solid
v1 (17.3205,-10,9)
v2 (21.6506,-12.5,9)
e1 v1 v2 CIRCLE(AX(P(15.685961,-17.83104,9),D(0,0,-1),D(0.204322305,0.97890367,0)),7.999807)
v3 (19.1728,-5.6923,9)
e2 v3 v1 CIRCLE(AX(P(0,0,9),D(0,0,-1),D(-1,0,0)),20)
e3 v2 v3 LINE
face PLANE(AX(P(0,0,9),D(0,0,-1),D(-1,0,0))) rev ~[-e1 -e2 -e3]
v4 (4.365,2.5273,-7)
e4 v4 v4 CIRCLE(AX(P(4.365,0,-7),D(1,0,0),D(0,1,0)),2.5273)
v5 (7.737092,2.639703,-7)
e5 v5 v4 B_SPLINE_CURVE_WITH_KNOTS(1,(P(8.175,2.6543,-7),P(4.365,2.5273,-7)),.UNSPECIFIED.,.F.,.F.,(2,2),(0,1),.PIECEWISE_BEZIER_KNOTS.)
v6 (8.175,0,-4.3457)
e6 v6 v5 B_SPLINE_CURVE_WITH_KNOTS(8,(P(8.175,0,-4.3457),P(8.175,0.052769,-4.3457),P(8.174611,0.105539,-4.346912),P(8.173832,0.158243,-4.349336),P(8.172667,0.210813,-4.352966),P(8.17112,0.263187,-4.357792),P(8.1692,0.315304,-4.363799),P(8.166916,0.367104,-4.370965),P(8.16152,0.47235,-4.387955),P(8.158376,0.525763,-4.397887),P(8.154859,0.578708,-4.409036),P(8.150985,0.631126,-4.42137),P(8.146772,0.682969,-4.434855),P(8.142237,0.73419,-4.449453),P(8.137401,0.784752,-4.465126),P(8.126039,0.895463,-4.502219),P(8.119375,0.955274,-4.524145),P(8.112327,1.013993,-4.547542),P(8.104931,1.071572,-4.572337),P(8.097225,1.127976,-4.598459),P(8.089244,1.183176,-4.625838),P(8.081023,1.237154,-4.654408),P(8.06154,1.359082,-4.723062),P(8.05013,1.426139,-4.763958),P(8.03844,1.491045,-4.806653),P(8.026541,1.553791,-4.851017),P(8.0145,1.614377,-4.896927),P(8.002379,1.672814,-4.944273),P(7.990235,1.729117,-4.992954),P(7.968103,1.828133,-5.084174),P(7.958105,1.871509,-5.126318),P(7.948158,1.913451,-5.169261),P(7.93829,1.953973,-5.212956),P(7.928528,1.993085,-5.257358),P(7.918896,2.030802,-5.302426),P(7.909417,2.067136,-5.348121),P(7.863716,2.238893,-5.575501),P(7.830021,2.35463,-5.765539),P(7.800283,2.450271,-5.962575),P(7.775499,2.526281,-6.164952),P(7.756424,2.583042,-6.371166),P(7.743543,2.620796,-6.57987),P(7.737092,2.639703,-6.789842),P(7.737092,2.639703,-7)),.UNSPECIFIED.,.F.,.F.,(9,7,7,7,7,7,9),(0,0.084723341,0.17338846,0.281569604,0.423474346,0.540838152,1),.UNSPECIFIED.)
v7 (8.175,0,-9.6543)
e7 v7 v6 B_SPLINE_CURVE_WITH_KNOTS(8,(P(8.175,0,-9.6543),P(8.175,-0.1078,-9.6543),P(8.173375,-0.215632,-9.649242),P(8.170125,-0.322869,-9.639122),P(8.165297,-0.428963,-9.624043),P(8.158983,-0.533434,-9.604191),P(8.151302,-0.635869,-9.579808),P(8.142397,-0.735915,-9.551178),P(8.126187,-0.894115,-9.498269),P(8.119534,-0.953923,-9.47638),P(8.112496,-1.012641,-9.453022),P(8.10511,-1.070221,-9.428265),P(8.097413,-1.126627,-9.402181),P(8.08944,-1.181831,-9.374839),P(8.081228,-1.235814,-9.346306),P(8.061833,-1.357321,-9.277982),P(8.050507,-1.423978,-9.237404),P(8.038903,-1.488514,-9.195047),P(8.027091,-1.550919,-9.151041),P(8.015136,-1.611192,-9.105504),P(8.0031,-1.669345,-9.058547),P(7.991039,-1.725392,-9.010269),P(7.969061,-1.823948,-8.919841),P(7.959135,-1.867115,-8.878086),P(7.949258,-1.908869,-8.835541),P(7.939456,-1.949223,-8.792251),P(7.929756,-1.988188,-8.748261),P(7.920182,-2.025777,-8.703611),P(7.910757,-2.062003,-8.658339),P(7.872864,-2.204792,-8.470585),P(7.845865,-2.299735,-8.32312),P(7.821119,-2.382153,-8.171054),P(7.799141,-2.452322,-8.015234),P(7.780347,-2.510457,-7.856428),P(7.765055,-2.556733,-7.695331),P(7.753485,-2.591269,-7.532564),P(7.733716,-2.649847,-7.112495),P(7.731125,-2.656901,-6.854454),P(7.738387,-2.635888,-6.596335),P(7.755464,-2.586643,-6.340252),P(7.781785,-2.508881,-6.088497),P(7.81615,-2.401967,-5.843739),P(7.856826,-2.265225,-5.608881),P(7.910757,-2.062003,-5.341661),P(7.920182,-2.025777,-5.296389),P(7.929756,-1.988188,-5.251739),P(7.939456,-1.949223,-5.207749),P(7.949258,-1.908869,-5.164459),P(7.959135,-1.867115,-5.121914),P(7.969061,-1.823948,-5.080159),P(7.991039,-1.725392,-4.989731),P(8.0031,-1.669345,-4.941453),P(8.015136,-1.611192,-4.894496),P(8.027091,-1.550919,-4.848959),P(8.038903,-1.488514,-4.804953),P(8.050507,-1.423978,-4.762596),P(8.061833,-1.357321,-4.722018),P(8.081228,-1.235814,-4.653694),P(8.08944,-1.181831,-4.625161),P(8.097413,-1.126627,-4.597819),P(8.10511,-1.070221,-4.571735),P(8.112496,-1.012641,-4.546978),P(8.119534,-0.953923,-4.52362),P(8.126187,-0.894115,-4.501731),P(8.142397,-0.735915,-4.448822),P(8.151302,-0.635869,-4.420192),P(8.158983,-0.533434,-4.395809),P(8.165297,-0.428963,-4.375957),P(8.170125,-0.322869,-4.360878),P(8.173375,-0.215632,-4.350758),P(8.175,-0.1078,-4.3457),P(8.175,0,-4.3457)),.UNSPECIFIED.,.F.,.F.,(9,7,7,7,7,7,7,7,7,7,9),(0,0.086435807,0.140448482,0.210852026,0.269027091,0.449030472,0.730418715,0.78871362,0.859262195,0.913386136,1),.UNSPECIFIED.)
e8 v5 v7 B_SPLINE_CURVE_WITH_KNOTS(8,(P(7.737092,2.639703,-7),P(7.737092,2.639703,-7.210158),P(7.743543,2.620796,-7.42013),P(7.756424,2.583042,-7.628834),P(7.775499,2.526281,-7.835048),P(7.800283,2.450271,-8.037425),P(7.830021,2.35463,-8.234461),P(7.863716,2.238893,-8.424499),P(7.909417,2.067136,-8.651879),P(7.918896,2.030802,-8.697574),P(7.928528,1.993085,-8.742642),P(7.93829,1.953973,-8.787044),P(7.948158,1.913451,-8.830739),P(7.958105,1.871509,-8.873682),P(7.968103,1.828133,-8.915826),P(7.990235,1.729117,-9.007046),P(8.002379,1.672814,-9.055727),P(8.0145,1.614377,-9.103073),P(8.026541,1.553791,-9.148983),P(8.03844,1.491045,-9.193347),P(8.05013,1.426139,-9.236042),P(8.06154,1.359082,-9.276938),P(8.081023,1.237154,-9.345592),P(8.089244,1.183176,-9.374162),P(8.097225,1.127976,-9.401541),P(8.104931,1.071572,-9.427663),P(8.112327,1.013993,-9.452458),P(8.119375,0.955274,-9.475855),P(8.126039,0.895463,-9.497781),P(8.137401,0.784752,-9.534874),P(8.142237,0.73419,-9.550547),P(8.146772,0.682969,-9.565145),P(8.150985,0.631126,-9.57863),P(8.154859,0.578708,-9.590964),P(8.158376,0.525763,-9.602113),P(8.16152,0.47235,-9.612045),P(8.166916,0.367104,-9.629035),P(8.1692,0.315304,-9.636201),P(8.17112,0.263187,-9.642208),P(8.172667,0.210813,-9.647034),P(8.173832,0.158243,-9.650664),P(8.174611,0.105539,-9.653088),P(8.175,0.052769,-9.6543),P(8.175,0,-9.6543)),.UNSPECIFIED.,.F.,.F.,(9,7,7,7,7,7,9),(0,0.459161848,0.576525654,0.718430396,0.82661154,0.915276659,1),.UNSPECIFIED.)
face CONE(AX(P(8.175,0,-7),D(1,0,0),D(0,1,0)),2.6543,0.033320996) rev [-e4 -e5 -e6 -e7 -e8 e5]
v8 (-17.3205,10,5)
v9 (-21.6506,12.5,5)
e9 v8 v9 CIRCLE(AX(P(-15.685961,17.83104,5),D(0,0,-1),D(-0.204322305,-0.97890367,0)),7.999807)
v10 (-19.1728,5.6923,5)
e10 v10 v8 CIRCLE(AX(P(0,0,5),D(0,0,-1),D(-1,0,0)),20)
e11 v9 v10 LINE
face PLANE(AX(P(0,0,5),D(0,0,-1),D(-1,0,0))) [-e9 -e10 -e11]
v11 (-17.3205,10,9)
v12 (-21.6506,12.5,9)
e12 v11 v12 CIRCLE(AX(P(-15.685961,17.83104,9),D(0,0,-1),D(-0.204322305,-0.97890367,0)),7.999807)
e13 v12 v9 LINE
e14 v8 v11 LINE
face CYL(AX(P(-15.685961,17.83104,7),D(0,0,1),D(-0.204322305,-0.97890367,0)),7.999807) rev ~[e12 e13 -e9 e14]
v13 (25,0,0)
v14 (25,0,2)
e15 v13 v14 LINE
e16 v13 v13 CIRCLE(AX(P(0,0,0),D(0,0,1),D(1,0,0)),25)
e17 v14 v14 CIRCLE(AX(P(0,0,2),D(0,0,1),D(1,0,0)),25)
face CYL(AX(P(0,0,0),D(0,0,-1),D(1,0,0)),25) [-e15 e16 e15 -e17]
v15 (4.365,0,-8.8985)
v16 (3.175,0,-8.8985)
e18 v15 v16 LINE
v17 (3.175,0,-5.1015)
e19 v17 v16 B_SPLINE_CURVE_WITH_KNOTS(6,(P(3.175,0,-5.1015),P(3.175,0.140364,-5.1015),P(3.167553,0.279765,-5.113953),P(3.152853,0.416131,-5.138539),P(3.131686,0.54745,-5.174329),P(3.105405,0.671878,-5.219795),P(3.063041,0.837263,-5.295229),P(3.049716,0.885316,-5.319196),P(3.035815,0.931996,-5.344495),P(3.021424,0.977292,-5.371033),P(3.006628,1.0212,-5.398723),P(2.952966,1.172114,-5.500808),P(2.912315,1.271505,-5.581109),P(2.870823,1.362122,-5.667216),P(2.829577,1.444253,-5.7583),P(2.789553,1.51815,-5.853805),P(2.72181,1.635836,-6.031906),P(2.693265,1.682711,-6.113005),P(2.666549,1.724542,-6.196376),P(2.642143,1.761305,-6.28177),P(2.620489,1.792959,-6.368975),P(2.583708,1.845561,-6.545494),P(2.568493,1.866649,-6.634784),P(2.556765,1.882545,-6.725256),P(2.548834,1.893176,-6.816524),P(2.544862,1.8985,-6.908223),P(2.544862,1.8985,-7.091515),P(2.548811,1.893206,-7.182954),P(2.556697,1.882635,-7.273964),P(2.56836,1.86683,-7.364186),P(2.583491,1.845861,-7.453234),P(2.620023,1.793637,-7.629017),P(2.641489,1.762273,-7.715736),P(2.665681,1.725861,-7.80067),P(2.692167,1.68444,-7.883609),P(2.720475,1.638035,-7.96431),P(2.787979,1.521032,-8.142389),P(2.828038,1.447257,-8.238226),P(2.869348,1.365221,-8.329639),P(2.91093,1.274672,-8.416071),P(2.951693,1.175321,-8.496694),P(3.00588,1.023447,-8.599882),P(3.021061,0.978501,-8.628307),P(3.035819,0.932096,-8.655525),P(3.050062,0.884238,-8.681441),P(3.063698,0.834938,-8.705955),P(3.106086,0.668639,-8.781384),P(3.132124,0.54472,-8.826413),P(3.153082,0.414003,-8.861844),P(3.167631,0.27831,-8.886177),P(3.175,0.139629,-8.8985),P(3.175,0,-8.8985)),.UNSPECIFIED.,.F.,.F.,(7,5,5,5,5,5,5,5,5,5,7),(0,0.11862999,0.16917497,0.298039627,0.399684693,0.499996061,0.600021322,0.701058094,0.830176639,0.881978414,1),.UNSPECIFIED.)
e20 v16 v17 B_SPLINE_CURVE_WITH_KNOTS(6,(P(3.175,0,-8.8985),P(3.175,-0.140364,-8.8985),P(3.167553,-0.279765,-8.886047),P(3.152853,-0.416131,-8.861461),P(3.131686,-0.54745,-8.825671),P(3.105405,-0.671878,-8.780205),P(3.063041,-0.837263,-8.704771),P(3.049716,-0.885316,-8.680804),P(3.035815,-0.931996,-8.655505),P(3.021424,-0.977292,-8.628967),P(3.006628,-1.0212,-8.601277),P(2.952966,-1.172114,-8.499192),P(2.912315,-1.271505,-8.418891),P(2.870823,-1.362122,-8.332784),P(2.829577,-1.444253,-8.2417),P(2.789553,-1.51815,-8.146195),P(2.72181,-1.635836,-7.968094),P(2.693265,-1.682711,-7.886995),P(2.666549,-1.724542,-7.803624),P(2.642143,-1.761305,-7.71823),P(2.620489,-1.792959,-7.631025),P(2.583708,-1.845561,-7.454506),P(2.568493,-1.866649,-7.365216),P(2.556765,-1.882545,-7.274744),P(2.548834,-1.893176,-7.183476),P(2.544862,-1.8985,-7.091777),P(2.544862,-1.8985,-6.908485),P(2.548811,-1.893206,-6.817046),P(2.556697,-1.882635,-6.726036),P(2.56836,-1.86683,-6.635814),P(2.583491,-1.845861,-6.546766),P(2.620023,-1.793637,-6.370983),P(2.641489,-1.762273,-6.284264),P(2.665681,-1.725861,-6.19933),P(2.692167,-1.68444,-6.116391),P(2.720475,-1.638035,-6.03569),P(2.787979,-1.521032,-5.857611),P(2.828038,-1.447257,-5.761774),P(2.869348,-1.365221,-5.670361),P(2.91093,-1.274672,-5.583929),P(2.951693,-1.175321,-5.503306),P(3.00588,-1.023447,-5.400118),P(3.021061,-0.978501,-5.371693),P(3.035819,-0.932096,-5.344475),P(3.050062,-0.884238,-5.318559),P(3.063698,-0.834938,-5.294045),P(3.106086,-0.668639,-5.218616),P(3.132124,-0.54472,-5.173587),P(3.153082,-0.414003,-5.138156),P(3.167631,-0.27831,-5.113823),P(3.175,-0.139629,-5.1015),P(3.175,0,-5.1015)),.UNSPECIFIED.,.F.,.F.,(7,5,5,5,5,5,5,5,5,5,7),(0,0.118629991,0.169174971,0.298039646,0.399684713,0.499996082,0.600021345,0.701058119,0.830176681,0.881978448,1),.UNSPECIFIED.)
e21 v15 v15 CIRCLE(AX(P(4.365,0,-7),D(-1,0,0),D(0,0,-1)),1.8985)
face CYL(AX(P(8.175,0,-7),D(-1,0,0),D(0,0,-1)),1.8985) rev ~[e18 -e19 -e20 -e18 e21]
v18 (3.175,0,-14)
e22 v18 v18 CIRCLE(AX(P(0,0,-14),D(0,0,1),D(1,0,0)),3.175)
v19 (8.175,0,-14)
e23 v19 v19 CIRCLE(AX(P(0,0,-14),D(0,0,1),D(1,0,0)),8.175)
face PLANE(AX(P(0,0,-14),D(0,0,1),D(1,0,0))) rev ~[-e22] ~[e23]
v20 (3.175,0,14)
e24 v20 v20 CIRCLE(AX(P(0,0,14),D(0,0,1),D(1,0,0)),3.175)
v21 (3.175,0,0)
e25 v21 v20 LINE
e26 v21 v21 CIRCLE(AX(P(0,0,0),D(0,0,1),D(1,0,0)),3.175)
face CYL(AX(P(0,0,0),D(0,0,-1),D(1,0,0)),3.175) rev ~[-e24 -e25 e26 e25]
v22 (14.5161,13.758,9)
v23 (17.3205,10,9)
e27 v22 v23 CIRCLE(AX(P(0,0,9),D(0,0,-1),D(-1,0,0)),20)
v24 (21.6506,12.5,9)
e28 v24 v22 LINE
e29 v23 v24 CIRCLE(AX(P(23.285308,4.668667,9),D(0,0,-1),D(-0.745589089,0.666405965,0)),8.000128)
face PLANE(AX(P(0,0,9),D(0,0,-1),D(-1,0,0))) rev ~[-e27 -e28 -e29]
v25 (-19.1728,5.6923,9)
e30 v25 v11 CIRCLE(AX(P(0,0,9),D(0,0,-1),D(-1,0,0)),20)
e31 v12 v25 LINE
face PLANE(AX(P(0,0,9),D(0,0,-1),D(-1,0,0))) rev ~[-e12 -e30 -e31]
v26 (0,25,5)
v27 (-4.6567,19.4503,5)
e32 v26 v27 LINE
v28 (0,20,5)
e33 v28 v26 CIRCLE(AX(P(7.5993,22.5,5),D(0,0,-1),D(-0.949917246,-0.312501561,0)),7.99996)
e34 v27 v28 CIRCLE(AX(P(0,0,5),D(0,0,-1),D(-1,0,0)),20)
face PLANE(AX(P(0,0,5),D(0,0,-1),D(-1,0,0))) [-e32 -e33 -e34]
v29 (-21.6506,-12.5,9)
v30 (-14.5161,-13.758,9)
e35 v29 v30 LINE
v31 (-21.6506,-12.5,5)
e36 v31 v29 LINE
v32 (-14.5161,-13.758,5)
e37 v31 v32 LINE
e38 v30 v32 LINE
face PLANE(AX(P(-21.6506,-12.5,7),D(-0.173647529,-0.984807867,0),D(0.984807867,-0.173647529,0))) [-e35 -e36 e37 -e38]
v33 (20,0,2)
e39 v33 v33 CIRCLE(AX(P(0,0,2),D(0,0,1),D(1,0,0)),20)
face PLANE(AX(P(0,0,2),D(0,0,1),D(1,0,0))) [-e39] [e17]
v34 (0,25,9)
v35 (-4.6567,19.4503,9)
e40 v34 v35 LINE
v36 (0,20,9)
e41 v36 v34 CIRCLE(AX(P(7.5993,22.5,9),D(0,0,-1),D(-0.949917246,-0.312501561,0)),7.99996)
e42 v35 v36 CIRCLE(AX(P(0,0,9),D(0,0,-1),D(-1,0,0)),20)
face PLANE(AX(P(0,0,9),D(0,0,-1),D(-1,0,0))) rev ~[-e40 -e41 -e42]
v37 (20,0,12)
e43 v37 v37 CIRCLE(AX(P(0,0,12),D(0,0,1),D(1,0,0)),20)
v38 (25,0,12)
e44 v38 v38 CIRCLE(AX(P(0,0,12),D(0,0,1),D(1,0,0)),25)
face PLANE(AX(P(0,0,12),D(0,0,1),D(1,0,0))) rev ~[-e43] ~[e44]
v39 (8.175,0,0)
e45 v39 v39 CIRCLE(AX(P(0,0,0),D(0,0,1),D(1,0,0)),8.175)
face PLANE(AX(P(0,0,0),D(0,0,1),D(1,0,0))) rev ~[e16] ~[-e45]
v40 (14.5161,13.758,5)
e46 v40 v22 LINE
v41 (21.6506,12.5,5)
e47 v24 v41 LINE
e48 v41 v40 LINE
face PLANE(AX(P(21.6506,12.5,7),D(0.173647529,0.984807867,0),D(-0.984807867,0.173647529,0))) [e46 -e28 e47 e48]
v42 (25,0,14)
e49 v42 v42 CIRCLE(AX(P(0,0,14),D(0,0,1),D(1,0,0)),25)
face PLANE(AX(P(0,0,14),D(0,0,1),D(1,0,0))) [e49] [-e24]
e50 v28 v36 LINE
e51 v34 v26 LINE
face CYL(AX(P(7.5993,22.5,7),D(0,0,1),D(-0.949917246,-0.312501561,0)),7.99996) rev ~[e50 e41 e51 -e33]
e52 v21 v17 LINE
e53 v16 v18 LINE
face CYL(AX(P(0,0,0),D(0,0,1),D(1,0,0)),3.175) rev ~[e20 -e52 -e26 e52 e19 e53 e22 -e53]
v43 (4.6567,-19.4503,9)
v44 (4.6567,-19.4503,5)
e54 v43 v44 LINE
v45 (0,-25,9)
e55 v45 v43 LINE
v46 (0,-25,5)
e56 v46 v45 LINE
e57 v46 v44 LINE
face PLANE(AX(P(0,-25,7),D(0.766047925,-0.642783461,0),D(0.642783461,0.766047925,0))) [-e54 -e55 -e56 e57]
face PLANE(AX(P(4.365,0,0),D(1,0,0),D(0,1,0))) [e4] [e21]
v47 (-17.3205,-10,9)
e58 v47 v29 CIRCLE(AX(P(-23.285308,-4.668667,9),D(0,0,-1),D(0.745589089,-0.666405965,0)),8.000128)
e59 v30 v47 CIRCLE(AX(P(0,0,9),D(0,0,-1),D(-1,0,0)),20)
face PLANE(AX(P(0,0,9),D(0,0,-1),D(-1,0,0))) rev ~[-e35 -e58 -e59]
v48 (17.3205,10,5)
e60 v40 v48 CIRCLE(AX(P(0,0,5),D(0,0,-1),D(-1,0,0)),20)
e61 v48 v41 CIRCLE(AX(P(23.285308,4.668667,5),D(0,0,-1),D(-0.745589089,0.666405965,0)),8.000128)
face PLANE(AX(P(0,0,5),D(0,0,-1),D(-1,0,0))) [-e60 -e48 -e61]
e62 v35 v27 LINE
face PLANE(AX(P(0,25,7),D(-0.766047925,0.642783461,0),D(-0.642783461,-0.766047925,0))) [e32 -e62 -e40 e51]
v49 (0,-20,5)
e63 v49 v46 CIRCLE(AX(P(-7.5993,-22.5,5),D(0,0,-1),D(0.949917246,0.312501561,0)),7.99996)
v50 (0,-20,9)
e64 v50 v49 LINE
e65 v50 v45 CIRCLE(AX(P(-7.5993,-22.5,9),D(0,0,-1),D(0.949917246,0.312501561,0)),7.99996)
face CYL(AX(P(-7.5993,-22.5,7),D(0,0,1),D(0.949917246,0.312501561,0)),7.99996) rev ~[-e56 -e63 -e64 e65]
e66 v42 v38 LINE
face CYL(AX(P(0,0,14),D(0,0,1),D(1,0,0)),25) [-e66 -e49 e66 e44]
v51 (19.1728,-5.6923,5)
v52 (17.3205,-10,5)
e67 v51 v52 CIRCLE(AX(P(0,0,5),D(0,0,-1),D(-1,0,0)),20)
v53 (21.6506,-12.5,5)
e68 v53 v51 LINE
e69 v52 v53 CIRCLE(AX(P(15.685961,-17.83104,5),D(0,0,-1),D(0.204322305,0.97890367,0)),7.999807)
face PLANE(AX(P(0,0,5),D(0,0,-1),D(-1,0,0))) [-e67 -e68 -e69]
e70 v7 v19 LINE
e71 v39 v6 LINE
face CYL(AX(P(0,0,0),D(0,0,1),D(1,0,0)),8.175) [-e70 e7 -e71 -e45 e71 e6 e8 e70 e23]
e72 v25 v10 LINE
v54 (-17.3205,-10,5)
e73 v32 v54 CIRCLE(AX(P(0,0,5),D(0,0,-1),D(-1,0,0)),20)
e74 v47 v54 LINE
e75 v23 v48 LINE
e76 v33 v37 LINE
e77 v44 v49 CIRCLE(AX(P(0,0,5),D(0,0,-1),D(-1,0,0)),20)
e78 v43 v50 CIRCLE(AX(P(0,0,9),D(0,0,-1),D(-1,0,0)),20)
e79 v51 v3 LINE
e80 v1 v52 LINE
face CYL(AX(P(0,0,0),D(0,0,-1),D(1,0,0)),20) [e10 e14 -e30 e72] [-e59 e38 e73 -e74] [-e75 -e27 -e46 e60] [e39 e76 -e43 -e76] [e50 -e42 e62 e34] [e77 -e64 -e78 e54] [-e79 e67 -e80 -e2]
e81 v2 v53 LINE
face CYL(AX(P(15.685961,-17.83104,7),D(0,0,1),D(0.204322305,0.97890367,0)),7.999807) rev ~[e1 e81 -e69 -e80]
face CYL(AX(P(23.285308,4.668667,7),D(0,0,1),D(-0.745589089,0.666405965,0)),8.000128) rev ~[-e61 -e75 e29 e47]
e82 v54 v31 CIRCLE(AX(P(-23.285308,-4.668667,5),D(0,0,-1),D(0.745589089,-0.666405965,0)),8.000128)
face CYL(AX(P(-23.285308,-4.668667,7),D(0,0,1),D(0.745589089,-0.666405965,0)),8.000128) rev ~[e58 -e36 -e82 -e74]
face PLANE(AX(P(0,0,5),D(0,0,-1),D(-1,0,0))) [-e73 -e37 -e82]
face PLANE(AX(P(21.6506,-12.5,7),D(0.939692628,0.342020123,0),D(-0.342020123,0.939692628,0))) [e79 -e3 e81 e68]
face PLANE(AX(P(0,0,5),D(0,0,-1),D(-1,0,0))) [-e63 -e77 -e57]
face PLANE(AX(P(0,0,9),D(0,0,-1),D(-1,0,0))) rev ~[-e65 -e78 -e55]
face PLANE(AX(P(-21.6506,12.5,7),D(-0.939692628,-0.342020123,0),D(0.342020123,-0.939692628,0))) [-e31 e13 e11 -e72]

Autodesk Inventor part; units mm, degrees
ref_plane "XZ Plane" through (0, 0, 0) normal (0, 1, 0) x (-1, 0, 0)
sketch "Sketch1" plane through (0, 0, 0) normal (0, 0, 1) x (1, 0, 0)
  circle A0 centre (0, 0) radius 20
  circle A1 centre (0, 0) radius 25
  circle A2 centre (0, 0) radius 3.175
  circle A3 centre (0, 0) radius 8.175
  dimension "d18" = 6.35
  dimension "d19" = 16.35
  dimension "d40" = 40
  dimension "d41" = 5
extrude "Extrusion1" add sketch "Sketch1" along normal blind 14 contours A0 | A2 | A3
extrude "Extrusion2" add sketch "Sketch1" along normal blind 2 contours A1
sketch "Sketch2" plane through (0, 0, 14) normal (0, 0, 1) x (1, 0, 0)
  circle A0 centre (0, 0) radius 20 projected
  circle A1 centre (0, 0) radius 25 projected
extrude "Extrusion3" add sketch "Sketch2" against normal blind 2
ref_plane "Work Plane1" through (0, 0, 7) normal (0, 0, -1) x (-1, 0, 0)
extrude "Extrusion5" cut sketch "Sketch1" along normal up to surface (14 mm away) contours A2
extrude "Extrusion6" add sketch "Sketch1" against normal blind 14 contours A3
ref_plane "Work Plane2" through (8.175, 0, 0) normal (1, 0, 0) x (0, 1, 0)
sketch "Sketch9" plane through (0, 0, 7) normal (0, 0, -1) x (-1, 0, 0)
  circle A0 centre (0, 0) radius 20 projected
  line L0 (0, -20) -> (0, -25) construction
  circle A1 centre (0, 0) radius 25 projected
  arc A2 (0, -20) -> (0, -25) centre (7.5993, -22.5) ccw
  line L1 (0, -25) -> (-4.6567, -19.4503)
  circle A3 centre (0, 0) radius 20
  line L2 (17.3205, -10) -> (21.6506, -12.5) construction
  line L3 (21.6506, -12.5) -> (14.5161, -13.758)
  arc A4 (17.3205, -10) -> (21.6506, -12.5) centre (23.2852, -4.6688) ccw
  line L4 (17.3205, 10) -> (21.6506, 12.5) construction
  line L5 (21.6506, 12.5) -> (19.1728, 5.6923)
  arc A5 (17.3205, 10) -> (21.6506, 12.5) centre (15.6859, 17.8312) ccw
  line L6 (0, 20) -> (0, 25) construction
  line L7 (0, 25) -> (4.6567, 19.4503)
  arc A6 (0, 20) -> (0, 25) centre (-7.5993, 22.5) ccw
  line L8 (-17.3205, 10) -> (-21.6506, 12.5) construction
  line L9 (-21.6506, 12.5) -> (-14.5161, 13.758)
  arc A7 (-17.3205, 10) -> (-21.6506, 12.5) centre (-23.2852, 4.6688) ccw
  line L10 (-17.3205, -10) -> (-21.6506, -12.5) construction
  line L11 (-21.6506, -12.5) -> (-19.1728, -5.6923)
  arc A8 (-17.3205, -10) -> (-21.6506, -12.5) centre (-15.6859, -17.8312) ccw
  point P0 (0, -22.5)
  point P1 (19.4856, -11.25)
  point P2 (19.4856, 11.25)
  point P3 (0, 22.5)
  point P4 (-19.4856, 11.25)
  point P5 (-19.4856, -11.25)
  dimension "d58" = 8
  dimension "d59" = 40
  dimension "d62" = 360
extrude "Extrusion9" add sketch "Sketch9" along normal mid plane 4 contours A0 A5 L5 | A4 L3 A0 | A0 A6 L7 | A2 L1 A0 | L9 A0 A7 | L11 A0 A8
sketch "Sketch10" plane through (8.175, 0, 0) normal (1, 0, 0) x (0, 1, 0)
  line L0 (0, 0) -> (0, -14) construction
  line L1 (-8.175, -14) -> (8.175, -14) construction
  circle A0 centre (0, -7) radius 2.6543
  circle A1 centre (0, -7) radius 2.5273
  dimension "d66" = 5.3086
  dimension "d67" = 5.0546
extrude "Extrusion10" cut sketch "Sketch10" against normal blind 3.81 contours A1
loft "Loft1" cut profiles "Sketch10" section 2 edges at (4.365, -2.5273, -7) contours A0 | A1
hole "Hole2" at (8.175, 0, -7) direction (-1, 0, 0) diameter 3.797 end up to surface clearance for "Flat Head Machine Screw (82)" size "#6" standard "Ansi Unified Screw Threads"
properties part number "intermediateSpindle"
